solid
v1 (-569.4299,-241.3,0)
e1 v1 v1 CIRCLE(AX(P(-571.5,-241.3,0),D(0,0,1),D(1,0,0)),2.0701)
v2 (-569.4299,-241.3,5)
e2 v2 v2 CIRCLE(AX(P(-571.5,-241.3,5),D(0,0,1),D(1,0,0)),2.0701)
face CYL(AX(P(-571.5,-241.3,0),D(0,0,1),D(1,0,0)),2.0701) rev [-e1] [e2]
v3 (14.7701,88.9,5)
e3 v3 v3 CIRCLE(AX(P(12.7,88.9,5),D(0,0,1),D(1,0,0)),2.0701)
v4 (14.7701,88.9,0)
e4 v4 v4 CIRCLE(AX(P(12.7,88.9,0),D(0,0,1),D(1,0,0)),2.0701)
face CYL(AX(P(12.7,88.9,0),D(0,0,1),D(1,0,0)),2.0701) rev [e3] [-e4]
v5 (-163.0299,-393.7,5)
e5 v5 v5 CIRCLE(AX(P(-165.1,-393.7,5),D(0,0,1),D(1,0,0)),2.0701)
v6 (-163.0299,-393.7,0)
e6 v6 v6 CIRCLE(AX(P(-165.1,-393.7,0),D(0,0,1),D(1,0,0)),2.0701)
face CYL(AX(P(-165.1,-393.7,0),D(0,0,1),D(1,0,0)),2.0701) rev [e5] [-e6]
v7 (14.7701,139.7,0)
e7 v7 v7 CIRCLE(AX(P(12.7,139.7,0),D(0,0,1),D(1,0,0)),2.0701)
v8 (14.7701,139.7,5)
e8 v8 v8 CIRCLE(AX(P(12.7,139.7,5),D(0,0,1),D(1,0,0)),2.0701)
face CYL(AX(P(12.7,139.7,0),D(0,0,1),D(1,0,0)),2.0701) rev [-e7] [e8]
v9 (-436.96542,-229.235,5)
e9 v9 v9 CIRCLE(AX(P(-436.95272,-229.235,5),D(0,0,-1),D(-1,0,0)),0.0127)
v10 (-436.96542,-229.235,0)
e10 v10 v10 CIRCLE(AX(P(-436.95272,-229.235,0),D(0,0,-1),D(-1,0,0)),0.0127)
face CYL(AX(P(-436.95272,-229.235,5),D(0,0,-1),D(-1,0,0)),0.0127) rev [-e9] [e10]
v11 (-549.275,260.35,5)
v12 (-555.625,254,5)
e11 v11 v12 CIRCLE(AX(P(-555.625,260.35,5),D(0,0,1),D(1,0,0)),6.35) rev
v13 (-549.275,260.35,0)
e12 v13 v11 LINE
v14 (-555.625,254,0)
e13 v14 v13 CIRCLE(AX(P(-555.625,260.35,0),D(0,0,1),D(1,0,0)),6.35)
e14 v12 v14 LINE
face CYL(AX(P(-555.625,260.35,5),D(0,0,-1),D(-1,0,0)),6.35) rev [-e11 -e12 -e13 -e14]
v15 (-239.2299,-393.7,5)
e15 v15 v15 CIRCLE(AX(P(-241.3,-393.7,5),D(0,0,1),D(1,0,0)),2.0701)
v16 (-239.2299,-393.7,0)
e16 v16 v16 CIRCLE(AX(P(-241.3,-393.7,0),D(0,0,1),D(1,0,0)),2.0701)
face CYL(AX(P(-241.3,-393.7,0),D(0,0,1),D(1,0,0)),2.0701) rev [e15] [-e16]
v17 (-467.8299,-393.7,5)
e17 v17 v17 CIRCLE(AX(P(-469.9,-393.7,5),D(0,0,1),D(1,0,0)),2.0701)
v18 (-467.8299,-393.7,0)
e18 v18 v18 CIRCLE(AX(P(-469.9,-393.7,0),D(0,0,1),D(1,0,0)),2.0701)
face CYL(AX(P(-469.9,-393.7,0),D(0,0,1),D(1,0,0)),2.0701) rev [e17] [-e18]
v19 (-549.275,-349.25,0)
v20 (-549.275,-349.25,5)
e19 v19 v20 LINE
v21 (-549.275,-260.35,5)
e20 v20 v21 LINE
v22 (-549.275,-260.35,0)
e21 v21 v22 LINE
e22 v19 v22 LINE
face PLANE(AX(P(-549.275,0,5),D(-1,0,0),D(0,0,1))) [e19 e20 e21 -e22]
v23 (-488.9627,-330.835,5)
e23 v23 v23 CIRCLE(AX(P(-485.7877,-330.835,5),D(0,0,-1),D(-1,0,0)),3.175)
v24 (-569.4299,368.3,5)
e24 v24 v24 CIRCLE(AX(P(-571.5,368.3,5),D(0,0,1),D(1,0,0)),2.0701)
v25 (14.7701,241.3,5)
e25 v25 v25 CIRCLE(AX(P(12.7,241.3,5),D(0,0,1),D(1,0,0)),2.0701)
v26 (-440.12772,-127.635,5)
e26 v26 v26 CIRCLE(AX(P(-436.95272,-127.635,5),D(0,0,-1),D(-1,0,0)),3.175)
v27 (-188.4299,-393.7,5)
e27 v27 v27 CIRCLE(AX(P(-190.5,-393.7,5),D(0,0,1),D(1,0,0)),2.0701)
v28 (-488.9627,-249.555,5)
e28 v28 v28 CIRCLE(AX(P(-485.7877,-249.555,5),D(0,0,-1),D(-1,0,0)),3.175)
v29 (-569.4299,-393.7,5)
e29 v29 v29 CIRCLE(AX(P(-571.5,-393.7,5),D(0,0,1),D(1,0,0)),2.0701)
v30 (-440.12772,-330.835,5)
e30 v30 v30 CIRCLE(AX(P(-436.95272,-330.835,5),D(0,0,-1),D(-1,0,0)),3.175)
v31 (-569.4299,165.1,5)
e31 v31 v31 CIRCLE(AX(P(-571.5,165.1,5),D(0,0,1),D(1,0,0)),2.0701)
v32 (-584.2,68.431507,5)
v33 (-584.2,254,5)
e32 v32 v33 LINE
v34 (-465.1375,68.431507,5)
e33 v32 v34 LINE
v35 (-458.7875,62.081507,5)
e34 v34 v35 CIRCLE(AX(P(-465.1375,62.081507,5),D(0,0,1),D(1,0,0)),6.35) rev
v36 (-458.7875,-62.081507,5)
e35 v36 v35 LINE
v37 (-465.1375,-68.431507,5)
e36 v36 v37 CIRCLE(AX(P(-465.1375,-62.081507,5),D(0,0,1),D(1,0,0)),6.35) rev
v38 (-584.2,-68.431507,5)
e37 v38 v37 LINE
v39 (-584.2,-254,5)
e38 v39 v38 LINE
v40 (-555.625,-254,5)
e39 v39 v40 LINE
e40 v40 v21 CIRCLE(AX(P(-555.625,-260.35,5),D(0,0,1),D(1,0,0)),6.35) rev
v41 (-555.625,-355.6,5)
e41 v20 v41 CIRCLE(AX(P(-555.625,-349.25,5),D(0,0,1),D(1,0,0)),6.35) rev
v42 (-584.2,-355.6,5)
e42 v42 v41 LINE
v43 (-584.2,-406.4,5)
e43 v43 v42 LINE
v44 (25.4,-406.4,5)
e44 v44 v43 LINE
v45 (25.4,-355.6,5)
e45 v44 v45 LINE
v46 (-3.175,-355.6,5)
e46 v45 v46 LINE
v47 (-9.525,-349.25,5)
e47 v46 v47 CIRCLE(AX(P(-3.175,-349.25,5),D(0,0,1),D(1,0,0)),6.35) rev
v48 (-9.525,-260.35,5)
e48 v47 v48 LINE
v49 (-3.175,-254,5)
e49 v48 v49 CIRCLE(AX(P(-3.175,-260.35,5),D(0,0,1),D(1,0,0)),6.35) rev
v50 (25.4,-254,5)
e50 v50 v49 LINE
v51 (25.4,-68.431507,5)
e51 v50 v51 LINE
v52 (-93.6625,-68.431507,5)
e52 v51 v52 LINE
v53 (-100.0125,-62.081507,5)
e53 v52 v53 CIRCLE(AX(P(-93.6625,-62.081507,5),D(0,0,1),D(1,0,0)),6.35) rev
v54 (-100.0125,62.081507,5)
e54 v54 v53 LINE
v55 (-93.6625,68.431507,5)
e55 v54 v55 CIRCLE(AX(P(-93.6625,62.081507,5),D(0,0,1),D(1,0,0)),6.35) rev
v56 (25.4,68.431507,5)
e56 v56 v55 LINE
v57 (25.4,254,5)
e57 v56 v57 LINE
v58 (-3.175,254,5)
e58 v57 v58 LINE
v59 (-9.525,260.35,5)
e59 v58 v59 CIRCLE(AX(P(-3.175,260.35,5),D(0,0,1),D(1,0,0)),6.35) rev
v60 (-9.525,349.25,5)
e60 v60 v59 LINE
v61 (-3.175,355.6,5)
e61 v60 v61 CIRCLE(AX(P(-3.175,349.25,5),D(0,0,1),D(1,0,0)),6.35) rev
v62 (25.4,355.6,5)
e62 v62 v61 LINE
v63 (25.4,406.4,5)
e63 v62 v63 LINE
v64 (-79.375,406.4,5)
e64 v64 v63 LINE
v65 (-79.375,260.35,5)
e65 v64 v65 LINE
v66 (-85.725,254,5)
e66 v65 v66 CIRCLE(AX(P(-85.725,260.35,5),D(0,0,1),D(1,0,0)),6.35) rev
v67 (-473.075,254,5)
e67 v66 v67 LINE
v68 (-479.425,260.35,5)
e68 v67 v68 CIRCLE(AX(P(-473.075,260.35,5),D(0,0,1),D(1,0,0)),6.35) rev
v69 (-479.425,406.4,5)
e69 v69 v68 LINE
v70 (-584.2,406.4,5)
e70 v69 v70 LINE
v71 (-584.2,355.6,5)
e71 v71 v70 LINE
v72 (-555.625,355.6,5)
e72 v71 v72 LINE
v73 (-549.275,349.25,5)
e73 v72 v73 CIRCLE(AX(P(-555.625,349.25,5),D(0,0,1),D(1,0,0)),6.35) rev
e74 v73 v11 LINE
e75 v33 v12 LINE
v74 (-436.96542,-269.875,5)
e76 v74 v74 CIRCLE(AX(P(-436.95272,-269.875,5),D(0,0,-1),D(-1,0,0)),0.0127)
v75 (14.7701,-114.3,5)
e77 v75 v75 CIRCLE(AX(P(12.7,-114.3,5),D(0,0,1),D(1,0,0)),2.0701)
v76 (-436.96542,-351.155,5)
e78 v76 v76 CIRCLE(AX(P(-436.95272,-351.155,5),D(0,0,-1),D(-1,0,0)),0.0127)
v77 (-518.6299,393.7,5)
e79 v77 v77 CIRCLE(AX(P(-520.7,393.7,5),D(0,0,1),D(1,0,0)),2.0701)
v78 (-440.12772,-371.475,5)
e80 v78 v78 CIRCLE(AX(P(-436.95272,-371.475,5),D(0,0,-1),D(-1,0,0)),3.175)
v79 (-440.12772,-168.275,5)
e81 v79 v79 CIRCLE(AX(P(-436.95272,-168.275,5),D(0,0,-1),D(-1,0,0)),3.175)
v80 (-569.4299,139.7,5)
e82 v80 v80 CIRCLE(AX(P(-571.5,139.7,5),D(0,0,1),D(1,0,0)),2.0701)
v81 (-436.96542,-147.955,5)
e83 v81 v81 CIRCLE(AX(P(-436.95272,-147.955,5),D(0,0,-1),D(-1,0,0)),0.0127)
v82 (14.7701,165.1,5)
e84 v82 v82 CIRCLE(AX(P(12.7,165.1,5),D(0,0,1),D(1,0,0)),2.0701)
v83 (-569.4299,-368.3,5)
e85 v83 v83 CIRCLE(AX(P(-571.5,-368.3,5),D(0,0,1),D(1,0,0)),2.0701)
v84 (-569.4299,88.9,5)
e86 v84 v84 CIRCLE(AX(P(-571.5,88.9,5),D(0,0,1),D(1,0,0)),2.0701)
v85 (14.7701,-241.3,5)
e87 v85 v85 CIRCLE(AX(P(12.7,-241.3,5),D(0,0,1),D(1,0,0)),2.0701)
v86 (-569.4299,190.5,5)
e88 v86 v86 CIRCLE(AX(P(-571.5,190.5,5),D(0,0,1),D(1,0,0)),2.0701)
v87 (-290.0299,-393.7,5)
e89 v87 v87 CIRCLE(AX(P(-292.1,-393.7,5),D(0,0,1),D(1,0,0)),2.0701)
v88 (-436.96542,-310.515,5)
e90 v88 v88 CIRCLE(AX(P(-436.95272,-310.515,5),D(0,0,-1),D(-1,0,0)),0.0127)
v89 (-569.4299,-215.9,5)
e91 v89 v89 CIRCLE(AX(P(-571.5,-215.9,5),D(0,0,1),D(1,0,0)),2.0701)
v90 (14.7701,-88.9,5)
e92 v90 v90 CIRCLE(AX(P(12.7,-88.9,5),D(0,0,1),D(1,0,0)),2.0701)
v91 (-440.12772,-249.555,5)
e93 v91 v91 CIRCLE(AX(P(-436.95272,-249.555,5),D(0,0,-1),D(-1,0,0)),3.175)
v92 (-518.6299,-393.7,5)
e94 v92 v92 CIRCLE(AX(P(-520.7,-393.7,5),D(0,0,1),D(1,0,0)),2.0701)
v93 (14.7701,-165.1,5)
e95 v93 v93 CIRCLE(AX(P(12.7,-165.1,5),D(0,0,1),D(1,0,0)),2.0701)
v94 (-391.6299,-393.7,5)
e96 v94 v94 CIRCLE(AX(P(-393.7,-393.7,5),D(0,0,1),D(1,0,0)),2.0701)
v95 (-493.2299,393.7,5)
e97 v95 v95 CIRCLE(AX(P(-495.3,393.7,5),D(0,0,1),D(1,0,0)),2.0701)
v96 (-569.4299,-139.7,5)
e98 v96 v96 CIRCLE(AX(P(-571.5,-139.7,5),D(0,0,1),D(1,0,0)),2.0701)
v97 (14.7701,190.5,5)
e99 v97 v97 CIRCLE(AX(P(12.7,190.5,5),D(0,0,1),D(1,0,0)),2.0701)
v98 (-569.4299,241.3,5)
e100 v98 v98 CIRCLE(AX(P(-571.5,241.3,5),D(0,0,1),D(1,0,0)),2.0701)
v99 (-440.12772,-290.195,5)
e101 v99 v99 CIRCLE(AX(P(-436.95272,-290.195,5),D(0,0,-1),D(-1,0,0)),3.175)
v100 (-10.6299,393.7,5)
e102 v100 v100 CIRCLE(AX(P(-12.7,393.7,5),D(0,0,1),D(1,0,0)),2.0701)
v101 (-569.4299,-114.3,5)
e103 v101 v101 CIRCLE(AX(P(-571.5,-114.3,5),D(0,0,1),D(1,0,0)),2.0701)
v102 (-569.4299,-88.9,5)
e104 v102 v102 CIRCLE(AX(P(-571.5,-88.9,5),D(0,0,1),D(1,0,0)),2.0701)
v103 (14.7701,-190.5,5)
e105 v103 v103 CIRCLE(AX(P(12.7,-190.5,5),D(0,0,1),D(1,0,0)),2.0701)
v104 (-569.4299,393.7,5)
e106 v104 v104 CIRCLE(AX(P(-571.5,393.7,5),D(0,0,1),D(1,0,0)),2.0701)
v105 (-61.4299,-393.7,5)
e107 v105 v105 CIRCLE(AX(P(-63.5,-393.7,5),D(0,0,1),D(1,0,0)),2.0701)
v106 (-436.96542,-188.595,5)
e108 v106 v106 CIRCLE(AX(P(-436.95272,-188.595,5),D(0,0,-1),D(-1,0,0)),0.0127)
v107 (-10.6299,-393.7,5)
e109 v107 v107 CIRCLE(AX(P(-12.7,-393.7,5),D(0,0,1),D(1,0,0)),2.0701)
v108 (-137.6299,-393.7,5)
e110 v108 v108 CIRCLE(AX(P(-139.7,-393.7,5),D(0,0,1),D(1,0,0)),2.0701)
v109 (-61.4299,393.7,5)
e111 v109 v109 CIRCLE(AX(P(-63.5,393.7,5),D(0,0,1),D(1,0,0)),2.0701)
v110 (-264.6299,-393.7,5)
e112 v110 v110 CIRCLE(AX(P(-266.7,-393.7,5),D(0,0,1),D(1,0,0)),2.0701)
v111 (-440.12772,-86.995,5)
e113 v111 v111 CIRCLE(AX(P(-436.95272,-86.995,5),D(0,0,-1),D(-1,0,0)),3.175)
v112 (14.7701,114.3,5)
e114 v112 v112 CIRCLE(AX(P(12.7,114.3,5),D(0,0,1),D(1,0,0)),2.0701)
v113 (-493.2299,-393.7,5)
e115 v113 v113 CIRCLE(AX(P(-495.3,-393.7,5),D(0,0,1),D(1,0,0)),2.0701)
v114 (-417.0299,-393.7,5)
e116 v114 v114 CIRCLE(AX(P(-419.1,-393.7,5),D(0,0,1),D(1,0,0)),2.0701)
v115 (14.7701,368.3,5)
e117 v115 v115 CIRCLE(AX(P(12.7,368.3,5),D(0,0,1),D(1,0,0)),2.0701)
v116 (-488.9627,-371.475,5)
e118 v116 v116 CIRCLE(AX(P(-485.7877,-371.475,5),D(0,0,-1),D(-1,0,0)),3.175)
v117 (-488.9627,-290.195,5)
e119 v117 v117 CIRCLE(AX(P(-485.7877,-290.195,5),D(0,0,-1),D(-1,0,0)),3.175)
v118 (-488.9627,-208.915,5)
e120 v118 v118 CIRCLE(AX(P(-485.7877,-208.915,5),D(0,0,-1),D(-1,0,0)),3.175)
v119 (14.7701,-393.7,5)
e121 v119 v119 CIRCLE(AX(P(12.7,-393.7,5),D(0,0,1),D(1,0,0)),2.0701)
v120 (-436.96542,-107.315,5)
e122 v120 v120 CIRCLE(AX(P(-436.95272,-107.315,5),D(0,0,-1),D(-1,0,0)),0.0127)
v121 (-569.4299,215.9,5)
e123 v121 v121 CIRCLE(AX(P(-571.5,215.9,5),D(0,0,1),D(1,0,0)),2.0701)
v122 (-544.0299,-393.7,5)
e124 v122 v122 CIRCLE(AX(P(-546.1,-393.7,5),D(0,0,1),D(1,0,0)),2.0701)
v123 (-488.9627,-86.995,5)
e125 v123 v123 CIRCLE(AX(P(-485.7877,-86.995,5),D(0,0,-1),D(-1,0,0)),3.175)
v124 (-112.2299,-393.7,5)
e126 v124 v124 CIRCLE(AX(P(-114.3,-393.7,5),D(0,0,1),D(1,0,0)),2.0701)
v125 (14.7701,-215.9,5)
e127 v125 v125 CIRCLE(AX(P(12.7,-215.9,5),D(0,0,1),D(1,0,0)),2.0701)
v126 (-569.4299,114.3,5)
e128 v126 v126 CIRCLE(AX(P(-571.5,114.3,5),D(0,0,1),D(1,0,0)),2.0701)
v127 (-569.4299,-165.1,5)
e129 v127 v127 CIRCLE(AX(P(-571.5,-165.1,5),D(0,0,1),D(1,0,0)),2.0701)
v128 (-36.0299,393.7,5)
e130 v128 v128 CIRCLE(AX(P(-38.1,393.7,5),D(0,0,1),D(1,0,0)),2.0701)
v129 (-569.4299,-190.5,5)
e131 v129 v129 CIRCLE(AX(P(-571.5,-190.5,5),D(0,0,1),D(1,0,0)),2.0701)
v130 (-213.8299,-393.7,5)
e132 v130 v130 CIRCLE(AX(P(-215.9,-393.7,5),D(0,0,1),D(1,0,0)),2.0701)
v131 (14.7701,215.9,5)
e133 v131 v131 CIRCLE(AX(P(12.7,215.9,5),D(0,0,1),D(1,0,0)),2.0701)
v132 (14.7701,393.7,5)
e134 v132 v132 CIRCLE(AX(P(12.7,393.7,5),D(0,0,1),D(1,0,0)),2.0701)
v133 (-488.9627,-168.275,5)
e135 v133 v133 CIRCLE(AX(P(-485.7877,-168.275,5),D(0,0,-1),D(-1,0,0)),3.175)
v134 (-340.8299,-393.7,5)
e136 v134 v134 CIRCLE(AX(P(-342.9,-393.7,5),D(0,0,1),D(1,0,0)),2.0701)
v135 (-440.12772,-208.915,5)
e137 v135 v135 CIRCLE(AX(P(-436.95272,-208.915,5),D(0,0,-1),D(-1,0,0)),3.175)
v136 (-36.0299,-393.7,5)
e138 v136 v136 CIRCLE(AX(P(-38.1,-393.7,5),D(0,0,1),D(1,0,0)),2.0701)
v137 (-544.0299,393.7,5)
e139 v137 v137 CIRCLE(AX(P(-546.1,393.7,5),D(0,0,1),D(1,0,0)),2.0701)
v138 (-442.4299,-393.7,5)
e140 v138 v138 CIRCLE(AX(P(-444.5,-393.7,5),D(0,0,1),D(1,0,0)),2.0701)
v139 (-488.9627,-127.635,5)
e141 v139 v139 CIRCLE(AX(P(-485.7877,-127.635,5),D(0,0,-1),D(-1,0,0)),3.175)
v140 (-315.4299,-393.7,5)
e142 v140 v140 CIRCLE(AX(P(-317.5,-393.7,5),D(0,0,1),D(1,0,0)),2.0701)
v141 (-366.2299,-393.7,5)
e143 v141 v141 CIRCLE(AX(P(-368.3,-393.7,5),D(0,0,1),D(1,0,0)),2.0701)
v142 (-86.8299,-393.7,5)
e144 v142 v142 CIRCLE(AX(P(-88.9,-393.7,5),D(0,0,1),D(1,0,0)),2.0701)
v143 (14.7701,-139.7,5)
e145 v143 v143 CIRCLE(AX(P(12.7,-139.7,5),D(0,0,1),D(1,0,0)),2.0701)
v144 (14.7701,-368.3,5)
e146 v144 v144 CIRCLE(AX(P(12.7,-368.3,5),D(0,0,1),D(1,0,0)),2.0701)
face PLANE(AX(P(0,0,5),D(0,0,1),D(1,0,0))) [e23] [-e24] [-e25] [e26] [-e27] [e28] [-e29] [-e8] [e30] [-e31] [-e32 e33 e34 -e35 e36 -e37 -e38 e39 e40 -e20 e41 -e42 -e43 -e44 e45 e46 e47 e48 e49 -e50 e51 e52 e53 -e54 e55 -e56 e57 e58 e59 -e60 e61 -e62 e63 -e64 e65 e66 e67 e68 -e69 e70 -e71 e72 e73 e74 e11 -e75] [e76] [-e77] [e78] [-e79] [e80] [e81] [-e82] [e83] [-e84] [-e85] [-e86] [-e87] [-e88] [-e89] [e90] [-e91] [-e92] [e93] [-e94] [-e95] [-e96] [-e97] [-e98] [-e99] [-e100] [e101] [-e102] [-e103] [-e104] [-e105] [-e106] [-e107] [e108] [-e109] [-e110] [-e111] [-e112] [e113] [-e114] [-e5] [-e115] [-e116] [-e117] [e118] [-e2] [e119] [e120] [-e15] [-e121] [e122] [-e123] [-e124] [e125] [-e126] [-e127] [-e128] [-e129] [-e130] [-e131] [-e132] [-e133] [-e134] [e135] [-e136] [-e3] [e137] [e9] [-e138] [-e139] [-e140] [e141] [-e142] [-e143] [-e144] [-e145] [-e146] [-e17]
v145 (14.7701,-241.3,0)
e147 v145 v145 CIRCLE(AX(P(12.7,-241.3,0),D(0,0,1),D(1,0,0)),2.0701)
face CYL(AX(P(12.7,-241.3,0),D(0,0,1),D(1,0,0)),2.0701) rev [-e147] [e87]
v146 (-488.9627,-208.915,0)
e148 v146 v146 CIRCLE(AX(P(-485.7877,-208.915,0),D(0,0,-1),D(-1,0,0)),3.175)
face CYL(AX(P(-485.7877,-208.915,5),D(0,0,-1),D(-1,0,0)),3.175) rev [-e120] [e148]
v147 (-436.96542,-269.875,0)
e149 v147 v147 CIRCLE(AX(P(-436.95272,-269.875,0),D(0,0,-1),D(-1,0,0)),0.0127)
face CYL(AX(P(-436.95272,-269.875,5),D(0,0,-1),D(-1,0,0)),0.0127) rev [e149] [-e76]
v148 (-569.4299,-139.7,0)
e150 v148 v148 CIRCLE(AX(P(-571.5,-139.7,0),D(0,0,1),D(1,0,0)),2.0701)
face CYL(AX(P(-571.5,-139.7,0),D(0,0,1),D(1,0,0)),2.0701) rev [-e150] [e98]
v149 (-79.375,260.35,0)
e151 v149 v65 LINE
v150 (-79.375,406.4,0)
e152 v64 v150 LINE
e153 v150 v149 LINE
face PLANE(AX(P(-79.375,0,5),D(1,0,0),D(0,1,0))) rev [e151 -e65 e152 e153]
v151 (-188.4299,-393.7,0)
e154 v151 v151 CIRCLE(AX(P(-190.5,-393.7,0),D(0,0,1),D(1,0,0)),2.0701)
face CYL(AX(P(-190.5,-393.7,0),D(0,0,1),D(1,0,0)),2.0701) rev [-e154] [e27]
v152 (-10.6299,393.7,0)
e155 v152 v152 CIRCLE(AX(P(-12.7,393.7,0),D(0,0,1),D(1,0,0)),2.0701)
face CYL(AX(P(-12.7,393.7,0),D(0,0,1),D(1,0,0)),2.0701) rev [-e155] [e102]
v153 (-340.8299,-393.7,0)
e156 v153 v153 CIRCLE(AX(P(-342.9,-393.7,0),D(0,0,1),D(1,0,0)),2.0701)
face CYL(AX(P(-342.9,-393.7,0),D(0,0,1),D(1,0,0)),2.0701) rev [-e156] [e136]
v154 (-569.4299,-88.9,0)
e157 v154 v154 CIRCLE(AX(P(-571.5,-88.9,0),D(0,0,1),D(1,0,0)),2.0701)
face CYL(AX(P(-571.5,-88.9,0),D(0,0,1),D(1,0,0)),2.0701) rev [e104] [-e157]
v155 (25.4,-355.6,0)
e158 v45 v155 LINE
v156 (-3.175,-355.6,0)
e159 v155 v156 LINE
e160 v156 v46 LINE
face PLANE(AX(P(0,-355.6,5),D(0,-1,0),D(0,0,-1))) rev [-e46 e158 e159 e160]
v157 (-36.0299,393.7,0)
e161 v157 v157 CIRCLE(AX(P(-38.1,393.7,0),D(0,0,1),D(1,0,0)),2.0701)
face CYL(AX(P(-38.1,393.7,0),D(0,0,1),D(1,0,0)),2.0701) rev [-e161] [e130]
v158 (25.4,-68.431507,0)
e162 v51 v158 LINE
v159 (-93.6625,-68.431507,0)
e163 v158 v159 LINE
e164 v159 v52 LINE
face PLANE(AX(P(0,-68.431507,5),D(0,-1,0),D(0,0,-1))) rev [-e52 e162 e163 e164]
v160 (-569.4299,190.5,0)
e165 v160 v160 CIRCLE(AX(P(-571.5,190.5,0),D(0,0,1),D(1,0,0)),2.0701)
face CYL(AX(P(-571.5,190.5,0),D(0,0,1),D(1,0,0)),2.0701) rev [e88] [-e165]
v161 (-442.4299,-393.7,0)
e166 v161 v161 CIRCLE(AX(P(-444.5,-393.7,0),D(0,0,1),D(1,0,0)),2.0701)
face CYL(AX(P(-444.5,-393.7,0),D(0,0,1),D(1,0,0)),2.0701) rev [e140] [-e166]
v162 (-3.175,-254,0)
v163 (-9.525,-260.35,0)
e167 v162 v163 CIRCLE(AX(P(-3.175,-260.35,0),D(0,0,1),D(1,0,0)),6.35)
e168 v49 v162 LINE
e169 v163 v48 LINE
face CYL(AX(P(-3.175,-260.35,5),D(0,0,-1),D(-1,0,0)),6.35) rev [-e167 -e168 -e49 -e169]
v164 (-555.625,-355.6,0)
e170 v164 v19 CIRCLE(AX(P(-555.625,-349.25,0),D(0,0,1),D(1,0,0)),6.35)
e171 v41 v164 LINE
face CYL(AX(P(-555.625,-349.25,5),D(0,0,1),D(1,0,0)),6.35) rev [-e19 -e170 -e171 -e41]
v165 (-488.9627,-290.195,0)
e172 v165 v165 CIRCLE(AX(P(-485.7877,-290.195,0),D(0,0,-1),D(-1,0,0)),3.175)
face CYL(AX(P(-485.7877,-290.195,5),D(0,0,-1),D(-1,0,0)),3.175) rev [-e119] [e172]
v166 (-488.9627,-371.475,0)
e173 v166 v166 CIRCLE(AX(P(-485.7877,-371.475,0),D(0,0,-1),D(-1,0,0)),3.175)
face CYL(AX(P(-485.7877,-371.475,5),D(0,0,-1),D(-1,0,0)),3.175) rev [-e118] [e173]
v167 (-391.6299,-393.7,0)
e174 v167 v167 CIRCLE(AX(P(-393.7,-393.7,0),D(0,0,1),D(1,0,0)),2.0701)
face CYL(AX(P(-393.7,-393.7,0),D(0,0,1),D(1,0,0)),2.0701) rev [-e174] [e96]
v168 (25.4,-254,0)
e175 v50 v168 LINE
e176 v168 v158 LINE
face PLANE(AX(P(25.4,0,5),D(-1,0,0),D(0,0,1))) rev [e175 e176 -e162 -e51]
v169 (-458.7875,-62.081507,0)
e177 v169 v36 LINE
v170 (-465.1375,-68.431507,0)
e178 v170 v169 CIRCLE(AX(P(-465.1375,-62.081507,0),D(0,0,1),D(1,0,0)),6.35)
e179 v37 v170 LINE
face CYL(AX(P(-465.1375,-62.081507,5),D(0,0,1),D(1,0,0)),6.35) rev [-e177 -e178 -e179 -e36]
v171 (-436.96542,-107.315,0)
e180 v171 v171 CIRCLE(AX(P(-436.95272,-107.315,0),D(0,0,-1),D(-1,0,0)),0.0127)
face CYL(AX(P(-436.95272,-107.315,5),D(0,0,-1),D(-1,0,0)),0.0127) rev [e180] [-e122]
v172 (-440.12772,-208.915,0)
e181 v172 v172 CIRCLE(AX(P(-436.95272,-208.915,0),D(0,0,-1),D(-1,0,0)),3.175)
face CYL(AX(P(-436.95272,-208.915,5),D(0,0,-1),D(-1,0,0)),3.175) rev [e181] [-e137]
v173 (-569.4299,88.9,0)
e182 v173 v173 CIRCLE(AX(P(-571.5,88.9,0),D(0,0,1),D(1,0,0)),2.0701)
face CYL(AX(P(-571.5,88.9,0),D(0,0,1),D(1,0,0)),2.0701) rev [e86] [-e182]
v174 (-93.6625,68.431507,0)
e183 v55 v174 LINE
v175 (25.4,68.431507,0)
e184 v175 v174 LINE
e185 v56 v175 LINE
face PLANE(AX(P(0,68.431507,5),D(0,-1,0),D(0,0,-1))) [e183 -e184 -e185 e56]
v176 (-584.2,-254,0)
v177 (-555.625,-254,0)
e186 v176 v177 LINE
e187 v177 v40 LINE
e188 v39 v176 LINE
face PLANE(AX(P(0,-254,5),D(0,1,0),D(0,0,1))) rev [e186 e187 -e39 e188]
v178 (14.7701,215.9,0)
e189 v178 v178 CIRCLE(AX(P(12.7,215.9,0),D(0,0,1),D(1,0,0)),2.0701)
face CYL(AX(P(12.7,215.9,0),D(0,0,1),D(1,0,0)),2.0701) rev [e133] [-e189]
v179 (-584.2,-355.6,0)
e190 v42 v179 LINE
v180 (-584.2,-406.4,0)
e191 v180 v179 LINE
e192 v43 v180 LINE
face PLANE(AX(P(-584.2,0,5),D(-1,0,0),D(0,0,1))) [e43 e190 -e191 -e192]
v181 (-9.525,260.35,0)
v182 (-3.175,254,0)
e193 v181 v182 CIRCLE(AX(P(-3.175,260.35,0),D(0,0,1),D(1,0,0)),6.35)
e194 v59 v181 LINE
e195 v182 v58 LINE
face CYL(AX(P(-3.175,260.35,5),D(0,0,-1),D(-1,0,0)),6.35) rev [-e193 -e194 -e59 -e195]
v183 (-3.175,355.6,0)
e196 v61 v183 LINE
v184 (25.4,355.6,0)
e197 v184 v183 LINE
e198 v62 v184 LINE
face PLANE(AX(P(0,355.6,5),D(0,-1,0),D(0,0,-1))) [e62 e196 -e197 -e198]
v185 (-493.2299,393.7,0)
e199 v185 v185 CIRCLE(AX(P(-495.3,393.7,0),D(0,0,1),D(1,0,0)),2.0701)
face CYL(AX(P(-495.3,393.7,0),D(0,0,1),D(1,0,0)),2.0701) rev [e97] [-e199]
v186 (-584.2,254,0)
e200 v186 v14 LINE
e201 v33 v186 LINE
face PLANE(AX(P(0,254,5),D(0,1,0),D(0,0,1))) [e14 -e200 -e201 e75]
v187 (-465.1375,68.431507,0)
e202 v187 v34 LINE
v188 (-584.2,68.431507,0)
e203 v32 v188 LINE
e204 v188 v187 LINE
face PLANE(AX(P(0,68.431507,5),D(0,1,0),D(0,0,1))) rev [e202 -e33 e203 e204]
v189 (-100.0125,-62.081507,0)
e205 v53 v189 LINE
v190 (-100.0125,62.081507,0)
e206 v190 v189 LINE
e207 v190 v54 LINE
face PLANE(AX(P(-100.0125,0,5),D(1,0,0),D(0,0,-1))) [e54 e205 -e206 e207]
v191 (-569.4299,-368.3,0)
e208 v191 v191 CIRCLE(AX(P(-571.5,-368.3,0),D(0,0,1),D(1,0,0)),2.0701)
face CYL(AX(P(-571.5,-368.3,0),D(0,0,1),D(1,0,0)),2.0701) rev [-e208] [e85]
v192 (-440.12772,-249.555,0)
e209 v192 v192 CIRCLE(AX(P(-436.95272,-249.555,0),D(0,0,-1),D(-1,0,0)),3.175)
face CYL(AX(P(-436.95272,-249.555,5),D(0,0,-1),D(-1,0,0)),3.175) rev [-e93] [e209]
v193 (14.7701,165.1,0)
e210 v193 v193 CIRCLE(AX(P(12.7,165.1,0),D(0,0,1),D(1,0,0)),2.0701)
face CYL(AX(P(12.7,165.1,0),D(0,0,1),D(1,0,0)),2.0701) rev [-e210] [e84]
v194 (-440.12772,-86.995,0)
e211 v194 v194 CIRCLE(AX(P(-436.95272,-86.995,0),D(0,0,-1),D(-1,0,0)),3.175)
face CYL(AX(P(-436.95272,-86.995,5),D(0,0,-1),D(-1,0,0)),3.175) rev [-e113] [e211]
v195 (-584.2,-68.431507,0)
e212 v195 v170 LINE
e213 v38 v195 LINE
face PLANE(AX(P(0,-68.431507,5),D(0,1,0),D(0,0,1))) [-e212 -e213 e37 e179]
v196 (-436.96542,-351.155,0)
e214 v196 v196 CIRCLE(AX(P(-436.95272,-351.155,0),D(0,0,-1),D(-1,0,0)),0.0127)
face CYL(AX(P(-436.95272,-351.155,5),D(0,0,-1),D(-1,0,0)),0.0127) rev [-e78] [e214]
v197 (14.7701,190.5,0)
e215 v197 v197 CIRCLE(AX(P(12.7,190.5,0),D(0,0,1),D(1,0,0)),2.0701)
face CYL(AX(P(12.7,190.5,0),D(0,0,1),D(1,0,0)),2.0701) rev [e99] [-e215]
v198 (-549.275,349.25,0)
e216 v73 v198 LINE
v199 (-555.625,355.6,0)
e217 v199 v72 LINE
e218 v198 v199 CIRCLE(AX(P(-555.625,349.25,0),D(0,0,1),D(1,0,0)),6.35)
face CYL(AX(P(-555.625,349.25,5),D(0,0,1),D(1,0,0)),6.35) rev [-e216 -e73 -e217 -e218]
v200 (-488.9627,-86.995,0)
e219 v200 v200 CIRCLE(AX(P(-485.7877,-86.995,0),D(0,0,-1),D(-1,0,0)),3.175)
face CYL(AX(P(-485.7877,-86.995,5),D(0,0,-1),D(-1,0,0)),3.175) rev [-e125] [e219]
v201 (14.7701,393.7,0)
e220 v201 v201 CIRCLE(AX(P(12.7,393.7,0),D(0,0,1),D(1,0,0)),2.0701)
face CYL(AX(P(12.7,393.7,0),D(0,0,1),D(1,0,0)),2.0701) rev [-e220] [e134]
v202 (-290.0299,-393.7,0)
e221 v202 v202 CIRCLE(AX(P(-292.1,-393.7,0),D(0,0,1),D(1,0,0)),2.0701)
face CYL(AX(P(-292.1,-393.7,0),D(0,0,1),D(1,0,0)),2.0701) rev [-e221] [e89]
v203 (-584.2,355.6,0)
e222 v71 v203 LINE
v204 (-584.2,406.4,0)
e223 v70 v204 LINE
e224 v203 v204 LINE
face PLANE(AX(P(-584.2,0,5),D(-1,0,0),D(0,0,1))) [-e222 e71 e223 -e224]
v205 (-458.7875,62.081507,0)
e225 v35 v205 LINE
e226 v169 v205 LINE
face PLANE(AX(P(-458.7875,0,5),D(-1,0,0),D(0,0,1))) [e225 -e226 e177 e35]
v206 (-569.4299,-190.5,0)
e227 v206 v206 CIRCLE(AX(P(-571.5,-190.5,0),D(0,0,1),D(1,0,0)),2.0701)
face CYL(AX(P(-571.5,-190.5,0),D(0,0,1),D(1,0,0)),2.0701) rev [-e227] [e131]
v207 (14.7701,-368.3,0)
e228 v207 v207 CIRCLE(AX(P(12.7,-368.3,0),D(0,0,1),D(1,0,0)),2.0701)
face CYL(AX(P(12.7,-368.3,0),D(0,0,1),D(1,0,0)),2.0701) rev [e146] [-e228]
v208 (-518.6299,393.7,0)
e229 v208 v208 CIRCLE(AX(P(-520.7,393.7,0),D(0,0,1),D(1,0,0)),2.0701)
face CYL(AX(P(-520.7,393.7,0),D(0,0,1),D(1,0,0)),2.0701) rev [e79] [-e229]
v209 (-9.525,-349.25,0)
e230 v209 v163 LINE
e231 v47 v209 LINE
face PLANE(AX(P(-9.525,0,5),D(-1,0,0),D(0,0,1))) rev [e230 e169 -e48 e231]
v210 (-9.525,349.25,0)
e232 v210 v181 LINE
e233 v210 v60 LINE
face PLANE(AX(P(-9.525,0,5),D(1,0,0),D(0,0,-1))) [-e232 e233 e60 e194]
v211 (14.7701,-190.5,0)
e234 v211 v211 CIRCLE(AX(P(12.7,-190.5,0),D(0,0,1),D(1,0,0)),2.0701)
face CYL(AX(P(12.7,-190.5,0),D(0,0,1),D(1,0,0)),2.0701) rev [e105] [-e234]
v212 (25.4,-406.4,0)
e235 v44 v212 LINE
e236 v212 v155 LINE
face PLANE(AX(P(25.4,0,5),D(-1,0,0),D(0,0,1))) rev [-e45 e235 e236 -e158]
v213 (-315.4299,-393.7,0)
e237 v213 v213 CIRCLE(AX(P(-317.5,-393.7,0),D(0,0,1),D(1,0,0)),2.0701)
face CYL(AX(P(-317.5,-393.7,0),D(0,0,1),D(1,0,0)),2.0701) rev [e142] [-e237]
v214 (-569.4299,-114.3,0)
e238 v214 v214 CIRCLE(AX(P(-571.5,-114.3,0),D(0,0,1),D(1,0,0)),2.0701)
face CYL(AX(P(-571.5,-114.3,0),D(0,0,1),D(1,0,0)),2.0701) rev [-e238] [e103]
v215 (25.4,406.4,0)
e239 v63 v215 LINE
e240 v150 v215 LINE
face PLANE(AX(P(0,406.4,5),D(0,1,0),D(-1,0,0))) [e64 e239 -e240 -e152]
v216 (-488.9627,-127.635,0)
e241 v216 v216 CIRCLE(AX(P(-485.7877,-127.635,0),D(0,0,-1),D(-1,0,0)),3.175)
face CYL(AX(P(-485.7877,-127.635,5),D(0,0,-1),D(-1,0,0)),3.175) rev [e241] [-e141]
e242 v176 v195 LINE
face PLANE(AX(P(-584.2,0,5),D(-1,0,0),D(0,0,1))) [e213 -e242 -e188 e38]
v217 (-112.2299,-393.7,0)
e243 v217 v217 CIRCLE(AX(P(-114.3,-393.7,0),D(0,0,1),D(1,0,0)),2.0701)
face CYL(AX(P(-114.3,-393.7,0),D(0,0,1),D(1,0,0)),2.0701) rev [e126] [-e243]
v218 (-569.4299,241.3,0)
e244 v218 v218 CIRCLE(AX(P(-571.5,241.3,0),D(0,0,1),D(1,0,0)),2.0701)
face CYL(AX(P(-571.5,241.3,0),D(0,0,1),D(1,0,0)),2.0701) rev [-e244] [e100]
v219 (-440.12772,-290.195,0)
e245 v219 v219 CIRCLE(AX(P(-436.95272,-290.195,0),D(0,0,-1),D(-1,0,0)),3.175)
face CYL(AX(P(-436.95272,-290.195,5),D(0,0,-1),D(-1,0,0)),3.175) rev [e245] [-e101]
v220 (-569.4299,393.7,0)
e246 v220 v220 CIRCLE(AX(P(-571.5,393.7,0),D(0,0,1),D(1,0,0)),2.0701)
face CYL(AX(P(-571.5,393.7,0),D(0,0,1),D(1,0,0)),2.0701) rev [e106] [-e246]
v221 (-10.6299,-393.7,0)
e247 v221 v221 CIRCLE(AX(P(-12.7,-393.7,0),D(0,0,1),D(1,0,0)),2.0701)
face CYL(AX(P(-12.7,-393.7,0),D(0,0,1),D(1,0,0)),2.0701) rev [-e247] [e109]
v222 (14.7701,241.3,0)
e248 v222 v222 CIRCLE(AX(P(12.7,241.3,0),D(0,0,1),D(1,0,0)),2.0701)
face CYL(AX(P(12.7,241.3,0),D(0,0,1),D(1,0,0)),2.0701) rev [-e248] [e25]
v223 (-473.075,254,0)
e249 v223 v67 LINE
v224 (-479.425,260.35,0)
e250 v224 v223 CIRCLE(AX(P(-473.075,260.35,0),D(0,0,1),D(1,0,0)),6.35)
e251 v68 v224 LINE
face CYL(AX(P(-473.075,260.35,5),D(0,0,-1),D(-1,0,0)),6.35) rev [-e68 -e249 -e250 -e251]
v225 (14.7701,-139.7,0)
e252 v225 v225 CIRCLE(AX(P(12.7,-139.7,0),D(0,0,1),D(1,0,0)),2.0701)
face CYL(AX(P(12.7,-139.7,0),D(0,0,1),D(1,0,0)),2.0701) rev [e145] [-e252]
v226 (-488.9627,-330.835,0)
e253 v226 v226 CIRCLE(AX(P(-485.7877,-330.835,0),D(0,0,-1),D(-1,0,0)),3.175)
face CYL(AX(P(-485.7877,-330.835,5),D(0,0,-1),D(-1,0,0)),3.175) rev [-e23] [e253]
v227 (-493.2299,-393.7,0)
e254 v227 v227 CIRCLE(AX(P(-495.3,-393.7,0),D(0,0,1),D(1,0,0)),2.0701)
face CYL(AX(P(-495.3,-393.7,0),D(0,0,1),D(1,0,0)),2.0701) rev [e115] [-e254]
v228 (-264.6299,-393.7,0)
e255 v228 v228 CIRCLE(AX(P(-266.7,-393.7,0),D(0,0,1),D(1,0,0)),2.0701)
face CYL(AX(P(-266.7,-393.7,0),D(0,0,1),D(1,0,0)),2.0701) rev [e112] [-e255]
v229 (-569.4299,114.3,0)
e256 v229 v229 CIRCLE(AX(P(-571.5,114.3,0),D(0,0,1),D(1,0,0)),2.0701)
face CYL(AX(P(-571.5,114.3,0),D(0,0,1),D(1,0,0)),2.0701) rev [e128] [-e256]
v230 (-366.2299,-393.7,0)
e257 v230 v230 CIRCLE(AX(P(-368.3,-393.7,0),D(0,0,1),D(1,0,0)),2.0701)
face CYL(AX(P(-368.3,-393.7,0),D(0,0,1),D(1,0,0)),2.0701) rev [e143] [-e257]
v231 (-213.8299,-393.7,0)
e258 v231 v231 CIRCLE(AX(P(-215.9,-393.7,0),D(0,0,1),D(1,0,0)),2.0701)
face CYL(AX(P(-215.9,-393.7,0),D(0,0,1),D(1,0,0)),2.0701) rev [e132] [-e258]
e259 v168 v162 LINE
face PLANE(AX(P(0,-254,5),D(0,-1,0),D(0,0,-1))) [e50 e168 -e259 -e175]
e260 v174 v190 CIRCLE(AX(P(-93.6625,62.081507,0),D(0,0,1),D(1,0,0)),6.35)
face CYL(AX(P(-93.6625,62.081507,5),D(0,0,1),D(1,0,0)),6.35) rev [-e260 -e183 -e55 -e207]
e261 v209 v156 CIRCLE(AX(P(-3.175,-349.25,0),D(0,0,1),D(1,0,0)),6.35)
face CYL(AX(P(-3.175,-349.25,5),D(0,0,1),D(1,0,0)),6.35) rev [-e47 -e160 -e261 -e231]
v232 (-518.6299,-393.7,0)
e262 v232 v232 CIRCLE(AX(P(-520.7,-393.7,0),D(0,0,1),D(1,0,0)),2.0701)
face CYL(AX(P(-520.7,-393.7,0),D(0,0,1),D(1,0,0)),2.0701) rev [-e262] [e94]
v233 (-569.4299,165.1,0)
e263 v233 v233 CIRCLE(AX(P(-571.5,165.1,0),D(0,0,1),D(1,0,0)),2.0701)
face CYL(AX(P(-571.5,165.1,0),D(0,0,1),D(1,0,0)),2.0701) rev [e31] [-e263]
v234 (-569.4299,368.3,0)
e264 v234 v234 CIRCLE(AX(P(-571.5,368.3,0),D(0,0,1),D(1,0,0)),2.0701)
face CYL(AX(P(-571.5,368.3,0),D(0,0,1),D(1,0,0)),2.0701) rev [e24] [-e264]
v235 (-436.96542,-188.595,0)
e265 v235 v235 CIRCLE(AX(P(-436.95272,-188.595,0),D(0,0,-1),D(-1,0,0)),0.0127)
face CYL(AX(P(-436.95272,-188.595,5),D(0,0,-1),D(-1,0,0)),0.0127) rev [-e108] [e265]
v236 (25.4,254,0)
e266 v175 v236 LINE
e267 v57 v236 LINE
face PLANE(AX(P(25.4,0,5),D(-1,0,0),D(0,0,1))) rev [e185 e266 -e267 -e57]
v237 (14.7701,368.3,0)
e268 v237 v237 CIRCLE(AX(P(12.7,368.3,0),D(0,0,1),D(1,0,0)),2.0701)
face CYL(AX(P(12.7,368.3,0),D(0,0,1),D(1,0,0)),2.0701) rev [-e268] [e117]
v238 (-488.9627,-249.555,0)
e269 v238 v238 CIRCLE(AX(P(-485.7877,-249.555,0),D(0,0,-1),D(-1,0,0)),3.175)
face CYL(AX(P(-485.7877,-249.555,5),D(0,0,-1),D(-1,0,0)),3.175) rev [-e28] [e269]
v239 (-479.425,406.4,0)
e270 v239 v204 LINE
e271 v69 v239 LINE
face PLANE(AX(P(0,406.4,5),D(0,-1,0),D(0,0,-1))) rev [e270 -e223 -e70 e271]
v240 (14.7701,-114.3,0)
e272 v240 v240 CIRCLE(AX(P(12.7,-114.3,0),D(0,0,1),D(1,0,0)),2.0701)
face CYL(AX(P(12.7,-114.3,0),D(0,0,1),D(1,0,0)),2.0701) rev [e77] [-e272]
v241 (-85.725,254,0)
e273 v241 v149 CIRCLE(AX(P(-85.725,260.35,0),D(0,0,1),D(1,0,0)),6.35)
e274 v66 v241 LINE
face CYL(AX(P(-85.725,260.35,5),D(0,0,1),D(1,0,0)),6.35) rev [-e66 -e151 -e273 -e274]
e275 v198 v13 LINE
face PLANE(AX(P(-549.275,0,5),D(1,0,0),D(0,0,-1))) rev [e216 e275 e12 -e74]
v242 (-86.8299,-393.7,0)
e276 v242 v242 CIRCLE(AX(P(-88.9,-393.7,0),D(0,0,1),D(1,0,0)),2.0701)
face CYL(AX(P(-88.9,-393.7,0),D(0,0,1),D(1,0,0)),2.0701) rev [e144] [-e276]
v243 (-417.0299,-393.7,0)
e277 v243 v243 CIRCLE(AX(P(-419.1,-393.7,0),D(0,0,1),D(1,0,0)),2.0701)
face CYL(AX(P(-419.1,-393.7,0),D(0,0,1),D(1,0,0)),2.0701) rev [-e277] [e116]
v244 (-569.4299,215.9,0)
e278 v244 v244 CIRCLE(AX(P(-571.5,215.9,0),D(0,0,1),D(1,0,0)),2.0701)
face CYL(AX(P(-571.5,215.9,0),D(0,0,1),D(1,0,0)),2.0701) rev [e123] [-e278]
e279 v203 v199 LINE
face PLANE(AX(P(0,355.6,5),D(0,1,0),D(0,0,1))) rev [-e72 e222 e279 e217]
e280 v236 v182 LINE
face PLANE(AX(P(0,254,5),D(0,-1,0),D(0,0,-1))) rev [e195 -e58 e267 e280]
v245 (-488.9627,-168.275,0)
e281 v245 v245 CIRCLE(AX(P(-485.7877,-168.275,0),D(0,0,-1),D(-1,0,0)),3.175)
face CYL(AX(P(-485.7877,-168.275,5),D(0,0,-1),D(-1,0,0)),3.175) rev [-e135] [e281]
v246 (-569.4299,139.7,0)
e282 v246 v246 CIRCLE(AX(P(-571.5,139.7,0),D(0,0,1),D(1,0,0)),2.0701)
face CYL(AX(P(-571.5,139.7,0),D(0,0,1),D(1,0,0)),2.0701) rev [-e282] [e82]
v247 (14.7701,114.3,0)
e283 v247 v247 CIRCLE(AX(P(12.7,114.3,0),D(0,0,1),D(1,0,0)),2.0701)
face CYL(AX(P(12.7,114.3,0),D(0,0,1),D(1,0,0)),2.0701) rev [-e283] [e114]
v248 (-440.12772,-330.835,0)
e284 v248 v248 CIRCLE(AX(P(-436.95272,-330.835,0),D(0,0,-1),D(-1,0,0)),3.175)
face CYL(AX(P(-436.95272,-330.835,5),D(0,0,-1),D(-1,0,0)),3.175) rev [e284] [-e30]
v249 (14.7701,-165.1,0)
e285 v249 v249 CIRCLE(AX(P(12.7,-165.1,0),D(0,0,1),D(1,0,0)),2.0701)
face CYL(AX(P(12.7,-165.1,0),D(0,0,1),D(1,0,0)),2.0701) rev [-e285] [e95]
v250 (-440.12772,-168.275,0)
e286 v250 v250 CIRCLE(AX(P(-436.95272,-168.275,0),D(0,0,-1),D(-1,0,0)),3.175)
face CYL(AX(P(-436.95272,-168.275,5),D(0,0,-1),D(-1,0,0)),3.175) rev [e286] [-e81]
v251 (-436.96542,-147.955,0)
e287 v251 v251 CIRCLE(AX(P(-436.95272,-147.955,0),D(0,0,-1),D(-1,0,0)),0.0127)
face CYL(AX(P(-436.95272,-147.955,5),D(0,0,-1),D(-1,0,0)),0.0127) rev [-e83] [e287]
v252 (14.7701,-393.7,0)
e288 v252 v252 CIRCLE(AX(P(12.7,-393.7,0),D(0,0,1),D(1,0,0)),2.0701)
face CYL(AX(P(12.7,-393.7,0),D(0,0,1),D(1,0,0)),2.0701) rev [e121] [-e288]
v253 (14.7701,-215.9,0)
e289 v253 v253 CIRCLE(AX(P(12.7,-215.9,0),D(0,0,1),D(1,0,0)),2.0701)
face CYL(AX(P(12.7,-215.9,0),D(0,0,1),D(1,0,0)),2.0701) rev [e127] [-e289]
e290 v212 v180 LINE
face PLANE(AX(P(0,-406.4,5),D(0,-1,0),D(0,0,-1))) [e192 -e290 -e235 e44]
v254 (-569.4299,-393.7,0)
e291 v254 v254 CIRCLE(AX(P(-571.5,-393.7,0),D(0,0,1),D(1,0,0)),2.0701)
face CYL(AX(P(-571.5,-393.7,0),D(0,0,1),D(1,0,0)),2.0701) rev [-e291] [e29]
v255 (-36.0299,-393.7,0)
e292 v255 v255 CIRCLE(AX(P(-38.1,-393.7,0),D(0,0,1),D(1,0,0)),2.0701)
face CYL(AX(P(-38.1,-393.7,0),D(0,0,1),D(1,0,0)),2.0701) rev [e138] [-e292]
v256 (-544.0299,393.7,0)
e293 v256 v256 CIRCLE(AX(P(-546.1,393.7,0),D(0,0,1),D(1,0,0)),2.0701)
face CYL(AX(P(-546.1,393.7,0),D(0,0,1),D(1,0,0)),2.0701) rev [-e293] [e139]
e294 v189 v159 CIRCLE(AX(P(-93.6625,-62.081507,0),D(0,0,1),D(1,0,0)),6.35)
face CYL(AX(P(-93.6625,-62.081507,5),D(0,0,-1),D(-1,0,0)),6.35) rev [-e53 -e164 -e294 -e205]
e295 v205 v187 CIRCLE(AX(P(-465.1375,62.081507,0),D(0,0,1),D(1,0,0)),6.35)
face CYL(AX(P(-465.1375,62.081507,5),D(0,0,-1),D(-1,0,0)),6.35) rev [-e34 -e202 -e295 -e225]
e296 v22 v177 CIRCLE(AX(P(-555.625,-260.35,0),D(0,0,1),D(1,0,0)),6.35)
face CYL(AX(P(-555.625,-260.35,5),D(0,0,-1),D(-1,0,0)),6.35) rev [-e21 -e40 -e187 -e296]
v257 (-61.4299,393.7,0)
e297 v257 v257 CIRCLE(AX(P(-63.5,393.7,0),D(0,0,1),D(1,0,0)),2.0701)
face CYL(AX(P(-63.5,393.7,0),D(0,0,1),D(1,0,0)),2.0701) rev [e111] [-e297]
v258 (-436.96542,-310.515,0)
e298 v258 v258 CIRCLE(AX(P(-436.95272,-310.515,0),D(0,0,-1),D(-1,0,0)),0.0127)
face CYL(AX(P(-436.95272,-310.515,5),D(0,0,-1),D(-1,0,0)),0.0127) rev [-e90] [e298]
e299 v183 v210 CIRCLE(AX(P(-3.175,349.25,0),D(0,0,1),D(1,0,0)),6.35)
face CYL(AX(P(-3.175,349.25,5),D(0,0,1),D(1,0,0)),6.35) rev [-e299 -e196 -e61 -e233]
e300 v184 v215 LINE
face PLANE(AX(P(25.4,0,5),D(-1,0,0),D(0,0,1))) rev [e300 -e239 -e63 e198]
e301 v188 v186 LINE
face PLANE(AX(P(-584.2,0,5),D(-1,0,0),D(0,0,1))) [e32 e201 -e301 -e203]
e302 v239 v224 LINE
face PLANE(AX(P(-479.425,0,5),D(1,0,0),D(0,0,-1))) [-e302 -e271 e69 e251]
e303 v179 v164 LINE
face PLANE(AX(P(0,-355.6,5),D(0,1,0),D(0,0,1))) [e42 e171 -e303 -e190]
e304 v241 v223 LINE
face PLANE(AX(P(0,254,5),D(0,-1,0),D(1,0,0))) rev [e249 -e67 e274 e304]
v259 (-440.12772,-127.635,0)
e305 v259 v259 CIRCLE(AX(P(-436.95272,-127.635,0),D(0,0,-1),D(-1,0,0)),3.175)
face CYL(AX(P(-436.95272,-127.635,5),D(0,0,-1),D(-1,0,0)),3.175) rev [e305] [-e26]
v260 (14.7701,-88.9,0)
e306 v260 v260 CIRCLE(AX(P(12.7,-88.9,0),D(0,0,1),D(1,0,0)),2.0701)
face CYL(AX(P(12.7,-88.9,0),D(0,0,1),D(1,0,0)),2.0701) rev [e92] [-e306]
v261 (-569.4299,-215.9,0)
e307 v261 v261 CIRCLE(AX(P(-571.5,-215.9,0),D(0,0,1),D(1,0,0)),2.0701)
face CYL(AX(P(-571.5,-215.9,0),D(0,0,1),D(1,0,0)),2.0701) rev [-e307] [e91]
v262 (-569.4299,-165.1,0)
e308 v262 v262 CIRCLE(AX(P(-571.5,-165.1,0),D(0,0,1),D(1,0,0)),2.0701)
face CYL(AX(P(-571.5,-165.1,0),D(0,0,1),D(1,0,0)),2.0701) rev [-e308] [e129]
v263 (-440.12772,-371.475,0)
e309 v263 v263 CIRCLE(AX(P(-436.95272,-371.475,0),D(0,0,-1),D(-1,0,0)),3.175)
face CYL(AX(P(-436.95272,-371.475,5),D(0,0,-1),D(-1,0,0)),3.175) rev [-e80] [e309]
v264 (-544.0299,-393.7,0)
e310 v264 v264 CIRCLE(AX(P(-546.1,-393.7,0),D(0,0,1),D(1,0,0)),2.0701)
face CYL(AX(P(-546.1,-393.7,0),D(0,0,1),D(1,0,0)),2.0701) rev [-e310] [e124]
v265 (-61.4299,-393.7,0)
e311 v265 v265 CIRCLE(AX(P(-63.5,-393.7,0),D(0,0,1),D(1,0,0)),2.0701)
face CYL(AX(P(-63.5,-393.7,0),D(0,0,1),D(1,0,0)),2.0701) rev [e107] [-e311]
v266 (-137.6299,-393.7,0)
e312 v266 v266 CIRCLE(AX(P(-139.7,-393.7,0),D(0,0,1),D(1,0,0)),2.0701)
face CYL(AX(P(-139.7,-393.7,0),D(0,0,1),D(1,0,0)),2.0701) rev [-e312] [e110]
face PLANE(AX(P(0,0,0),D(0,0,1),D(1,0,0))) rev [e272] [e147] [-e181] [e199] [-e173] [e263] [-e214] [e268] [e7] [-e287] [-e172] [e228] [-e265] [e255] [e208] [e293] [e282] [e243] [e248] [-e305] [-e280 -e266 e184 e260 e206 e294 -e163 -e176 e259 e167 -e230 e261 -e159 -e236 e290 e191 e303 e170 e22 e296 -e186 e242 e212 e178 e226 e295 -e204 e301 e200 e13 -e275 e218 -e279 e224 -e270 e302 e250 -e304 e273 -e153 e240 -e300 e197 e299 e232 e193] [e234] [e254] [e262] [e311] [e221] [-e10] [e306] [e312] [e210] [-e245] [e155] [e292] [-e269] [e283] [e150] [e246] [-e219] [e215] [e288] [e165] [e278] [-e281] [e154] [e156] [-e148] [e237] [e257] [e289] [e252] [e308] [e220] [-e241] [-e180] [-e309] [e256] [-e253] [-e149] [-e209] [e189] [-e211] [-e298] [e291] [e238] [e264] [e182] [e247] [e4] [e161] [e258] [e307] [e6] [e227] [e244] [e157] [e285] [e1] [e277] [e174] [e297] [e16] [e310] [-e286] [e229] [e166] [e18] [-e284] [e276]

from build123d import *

# Parameters (mm, degrees)
BOSS_EXTRUDE1_DEPTH = 5
SKETCH4_R           = 2.0701
CUT_EXTRUDE1_DEPTH  = 712.6709914
LPATTERN2_COUNT     = 24
LPATTERN2_PITCH     = 25.4
LPATTERN3_COUNT     = 32
LPATTERN3_PITCH     = 25.4
LPATTERN4_OUTLINE_R = 2.0701
LPATTERN4_DEPTH     = 5
LPATTERN5_OUTLINE_R = 2.0701
LPATTERN5_DEPTH     = 5
FILLET1_R           = 6.35
SKETCH6_R           = 3.175
CUT_EXTRUDE2_DEPTH  = 712.6709914
LPATTERN6_COUNT     = 7
LPATTERN6_PITCH     = 40.64


# Read off the part's stored shape, not the designer's step: LPattern4, LPattern5
with BuildPart() as part:
    # Sketch1 → Boss-Extrude1 (new body)
    with BuildSketch(Plane.XY):
        Polygon((-549.275, -355.6), (-584.2, -355.6), (-584.2, -406.4), (25.4, -406.4), (25.4, -355.6), (-9.525, -355.6), (-9.525, -254), (25.4, -254), (25.4, -68.43150672), (-100.0125, -68.43150672), (-100.0125, 68.43150672), (25.4, 68.43150672), (25.4, 254), (-9.525, 254), (-9.525, 355.6), (25.4, 355.6), (25.4, 406.4), (-79.375, 406.4), (-79.375, 254), (-479.425, 254), (-479.425, 406.4), (-584.2, 406.4), (-584.2, 355.6), (-549.275, 355.6), (-549.275, 254), (-584.2, 254), (-584.2, 68.43150672), (-458.7875, 68.43150672), (-458.7875, -68.43150672), (-584.2, -68.43150672), (-584.2, -254), (-549.275, -254), align=None)
    extrude(amount=BOSS_EXTRUDE1_DEPTH)

    # Sketch4 → Cut-Extrude1 (cut, symmetric)
    with BuildSketch(Plane.XY.offset(5)):
        with Locations((-571.5, 393.7)):
            Circle(SKETCH4_R)
    cut_extrude1 = extrude(amount=CUT_EXTRUDE1_DEPTH, both=True, mode=Mode.SUBTRACT)

    # LPattern2: Cut-Extrude1 ×24, 16 skipped
    with Locations(*[(i * LPATTERN2_PITCH, 0, 0) for i in range(1, LPATTERN2_COUNT) if i not in (4, 5, 6, 7, 8, 9, 10, 11, 12, 13, 14, 15, 16, 17, 18, 19)]):
        add(cut_extrude1, mode=Mode.SUBTRACT)

    # LPattern3: Cut-Extrude1 ×32, 13 skipped
    with Locations(*[(0, -i * LPATTERN3_PITCH, 0) for i in range(1, LPATTERN3_COUNT) if i not in (2, 3, 4, 5, 14, 15, 16, 17, 18, 26, 27, 28, 29)]):
        add(cut_extrude1, mode=Mode.SUBTRACT)

    # LPattern4 outline → LPattern4 (cut)
    with BuildSketch(Plane.XY):
        with Locations((12.7, -393.7)):
            Circle(LPATTERN4_OUTLINE_R)
        with Locations((-12.7, -393.7)):
            Circle(LPATTERN4_OUTLINE_R)
        with Locations((-38.1, -393.7)):
            Circle(LPATTERN4_OUTLINE_R)
        with Locations((-63.5, -393.7)):
            Circle(LPATTERN4_OUTLINE_R)
        with Locations((-88.9, -393.7)):
            Circle(LPATTERN4_OUTLINE_R)
        with Locations((-114.3, -393.7)):
            Circle(LPATTERN4_OUTLINE_R)
        with Locations((-139.7, -393.7)):
            Circle(LPATTERN4_OUTLINE_R)
        with Locations((-165.1, -393.7)):
            Circle(LPATTERN4_OUTLINE_R)
        with Locations((-190.5, -393.7)):
            Circle(LPATTERN4_OUTLINE_R)
        with Locations((-215.9, -393.7)):
            Circle(LPATTERN4_OUTLINE_R)
        with Locations((-241.3, -393.7)):
            Circle(LPATTERN4_OUTLINE_R)
        with Locations((-266.7, -393.7)):
            Circle(LPATTERN4_OUTLINE_R)
        with Locations((-292.1, -393.7)):
            Circle(LPATTERN4_OUTLINE_R)
        with Locations((-317.5, -393.7)):
            Circle(LPATTERN4_OUTLINE_R)
        with Locations((-342.9, -393.7)):
            Circle(LPATTERN4_OUTLINE_R)
        with Locations((-368.3, -393.7)):
            Circle(LPATTERN4_OUTLINE_R)
        with Locations((-393.7, -393.7)):
            Circle(LPATTERN4_OUTLINE_R)
        with Locations((-419.1, -393.7)):
            Circle(LPATTERN4_OUTLINE_R)
        with Locations((-444.5, -393.7)):
            Circle(LPATTERN4_OUTLINE_R)
        with Locations((-469.9, -393.7)):
            Circle(LPATTERN4_OUTLINE_R)
        with Locations((-495.3, -393.7)):
            Circle(LPATTERN4_OUTLINE_R)
        with Locations((-520.7, -393.7)):
            Circle(LPATTERN4_OUTLINE_R)
        with Locations((-546.1, -393.7)):
            Circle(LPATTERN4_OUTLINE_R)
    extrude(amount=LPATTERN4_DEPTH, mode=Mode.SUBTRACT)

    # LPattern5 outline → LPattern5 (cut)
    with BuildSketch(Plane.XY):
        with Locations((12.7, -368.3)):
            Circle(LPATTERN5_OUTLINE_R)
        with Locations((12.7, -241.3)):
            Circle(LPATTERN5_OUTLINE_R)
        with Locations((12.7, -215.9)):
            Circle(LPATTERN5_OUTLINE_R)
        with Locations((12.7, -190.5)):
            Circle(LPATTERN5_OUTLINE_R)
        with Locations((12.7, -165.1)):
            Circle(LPATTERN5_OUTLINE_R)
        with Locations((12.7, -139.7)):
            Circle(LPATTERN5_OUTLINE_R)
        with Locations((12.7, -114.3)):
            Circle(LPATTERN5_OUTLINE_R)
        with Locations((12.7, -88.9)):
            Circle(LPATTERN5_OUTLINE_R)
        with Locations((12.7, 88.9)):
            Circle(LPATTERN5_OUTLINE_R)
        with Locations((12.7, 114.3)):
            Circle(LPATTERN5_OUTLINE_R)
        with Locations((12.7, 139.7)):
            Circle(LPATTERN5_OUTLINE_R)
        with Locations((12.7, 165.1)):
            Circle(LPATTERN5_OUTLINE_R)
        with Locations((12.7, 190.5)):
            Circle(LPATTERN5_OUTLINE_R)
        with Locations((12.7, 215.9)):
            Circle(LPATTERN5_OUTLINE_R)
        with Locations((12.7, 241.3)):
            Circle(LPATTERN5_OUTLINE_R)
        with Locations((12.7, 368.3)):
            Circle(LPATTERN5_OUTLINE_R)
    extrude(amount=LPATTERN5_DEPTH, mode=Mode.SUBTRACT)

    # Fillet1
    fillet1_edges = [part.edges().sort_by_distance(p)[0] for p in [
        (-549.275, -355.6, 2.5),
        (-549.275, -254, 2.5),
        (-458.7875, -68.43150672, 2.5),
        (-458.7875, 68.43150672, 2.5),
        (-549.275, 254, 2.5),
        (-549.275, 355.6, 2.5),
        (-479.425, 254, 2.5),
        (-79.375, 254, 2.5),
        (-9.525, 355.6, 2.5),
        (-9.525, 254, 2.5),
        (-100.0125, 68.43150672, 2.5),
        (-100.0125, -68.43150672, 2.5),
        (-9.525, -254, 2.5),
        (-9.525, -355.6, 2.5),
    ]]
    fillet(fillet1_edges, radius=FILLET1_R)

    # Sketch6 → Cut-Extrude2 (cut, through all)
    with BuildSketch(Plane(origin=(0, 0, 0), x_dir=(-1, 0, 0), z_dir=(0, 0, -1))):
        with Locations((436.9527202, -330.835)):
            Circle(SKETCH6_R)
        with Locations((436.9527202, -371.475)):
            Circle(SKETCH6_R)
        with Locations((485.7877, -371.475)):
            Circle(SKETCH6_R)
        with Locations((485.7877, -330.835)):
            Circle(SKETCH6_R)
        with BuildLine():
            ThreePointArc((436.9654202, -351.155), (436.961700456, -351.146019744), (436.9527202, -351.1423))
            Line((436.9527202, -351.1423), (436.9527202, -351.1677))
            ThreePointArc((436.9527202, -351.1677), (436.961700456, -351.163980256), (436.9654202, -351.155))
        make_face()
        with BuildLine():
            Line((436.9527202, -351.1677), (436.9527202, -351.1423))
            ThreePointArc((436.9527202, -351.1423), (436.9400202, -351.155), (436.9527202, -351.1677))
        make_face()
    cut_extrude2 = extrude(amount=-CUT_EXTRUDE2_DEPTH, mode=Mode.SUBTRACT)

    # LPattern6: Cut-Extrude2 ×7
    with Locations(*[(0, i * LPATTERN6_PITCH, 0) for i in range(1, LPATTERN6_COUNT)]):
        add(cut_extrude2, mode=Mode.SUBTRACT)


solid = part.part
